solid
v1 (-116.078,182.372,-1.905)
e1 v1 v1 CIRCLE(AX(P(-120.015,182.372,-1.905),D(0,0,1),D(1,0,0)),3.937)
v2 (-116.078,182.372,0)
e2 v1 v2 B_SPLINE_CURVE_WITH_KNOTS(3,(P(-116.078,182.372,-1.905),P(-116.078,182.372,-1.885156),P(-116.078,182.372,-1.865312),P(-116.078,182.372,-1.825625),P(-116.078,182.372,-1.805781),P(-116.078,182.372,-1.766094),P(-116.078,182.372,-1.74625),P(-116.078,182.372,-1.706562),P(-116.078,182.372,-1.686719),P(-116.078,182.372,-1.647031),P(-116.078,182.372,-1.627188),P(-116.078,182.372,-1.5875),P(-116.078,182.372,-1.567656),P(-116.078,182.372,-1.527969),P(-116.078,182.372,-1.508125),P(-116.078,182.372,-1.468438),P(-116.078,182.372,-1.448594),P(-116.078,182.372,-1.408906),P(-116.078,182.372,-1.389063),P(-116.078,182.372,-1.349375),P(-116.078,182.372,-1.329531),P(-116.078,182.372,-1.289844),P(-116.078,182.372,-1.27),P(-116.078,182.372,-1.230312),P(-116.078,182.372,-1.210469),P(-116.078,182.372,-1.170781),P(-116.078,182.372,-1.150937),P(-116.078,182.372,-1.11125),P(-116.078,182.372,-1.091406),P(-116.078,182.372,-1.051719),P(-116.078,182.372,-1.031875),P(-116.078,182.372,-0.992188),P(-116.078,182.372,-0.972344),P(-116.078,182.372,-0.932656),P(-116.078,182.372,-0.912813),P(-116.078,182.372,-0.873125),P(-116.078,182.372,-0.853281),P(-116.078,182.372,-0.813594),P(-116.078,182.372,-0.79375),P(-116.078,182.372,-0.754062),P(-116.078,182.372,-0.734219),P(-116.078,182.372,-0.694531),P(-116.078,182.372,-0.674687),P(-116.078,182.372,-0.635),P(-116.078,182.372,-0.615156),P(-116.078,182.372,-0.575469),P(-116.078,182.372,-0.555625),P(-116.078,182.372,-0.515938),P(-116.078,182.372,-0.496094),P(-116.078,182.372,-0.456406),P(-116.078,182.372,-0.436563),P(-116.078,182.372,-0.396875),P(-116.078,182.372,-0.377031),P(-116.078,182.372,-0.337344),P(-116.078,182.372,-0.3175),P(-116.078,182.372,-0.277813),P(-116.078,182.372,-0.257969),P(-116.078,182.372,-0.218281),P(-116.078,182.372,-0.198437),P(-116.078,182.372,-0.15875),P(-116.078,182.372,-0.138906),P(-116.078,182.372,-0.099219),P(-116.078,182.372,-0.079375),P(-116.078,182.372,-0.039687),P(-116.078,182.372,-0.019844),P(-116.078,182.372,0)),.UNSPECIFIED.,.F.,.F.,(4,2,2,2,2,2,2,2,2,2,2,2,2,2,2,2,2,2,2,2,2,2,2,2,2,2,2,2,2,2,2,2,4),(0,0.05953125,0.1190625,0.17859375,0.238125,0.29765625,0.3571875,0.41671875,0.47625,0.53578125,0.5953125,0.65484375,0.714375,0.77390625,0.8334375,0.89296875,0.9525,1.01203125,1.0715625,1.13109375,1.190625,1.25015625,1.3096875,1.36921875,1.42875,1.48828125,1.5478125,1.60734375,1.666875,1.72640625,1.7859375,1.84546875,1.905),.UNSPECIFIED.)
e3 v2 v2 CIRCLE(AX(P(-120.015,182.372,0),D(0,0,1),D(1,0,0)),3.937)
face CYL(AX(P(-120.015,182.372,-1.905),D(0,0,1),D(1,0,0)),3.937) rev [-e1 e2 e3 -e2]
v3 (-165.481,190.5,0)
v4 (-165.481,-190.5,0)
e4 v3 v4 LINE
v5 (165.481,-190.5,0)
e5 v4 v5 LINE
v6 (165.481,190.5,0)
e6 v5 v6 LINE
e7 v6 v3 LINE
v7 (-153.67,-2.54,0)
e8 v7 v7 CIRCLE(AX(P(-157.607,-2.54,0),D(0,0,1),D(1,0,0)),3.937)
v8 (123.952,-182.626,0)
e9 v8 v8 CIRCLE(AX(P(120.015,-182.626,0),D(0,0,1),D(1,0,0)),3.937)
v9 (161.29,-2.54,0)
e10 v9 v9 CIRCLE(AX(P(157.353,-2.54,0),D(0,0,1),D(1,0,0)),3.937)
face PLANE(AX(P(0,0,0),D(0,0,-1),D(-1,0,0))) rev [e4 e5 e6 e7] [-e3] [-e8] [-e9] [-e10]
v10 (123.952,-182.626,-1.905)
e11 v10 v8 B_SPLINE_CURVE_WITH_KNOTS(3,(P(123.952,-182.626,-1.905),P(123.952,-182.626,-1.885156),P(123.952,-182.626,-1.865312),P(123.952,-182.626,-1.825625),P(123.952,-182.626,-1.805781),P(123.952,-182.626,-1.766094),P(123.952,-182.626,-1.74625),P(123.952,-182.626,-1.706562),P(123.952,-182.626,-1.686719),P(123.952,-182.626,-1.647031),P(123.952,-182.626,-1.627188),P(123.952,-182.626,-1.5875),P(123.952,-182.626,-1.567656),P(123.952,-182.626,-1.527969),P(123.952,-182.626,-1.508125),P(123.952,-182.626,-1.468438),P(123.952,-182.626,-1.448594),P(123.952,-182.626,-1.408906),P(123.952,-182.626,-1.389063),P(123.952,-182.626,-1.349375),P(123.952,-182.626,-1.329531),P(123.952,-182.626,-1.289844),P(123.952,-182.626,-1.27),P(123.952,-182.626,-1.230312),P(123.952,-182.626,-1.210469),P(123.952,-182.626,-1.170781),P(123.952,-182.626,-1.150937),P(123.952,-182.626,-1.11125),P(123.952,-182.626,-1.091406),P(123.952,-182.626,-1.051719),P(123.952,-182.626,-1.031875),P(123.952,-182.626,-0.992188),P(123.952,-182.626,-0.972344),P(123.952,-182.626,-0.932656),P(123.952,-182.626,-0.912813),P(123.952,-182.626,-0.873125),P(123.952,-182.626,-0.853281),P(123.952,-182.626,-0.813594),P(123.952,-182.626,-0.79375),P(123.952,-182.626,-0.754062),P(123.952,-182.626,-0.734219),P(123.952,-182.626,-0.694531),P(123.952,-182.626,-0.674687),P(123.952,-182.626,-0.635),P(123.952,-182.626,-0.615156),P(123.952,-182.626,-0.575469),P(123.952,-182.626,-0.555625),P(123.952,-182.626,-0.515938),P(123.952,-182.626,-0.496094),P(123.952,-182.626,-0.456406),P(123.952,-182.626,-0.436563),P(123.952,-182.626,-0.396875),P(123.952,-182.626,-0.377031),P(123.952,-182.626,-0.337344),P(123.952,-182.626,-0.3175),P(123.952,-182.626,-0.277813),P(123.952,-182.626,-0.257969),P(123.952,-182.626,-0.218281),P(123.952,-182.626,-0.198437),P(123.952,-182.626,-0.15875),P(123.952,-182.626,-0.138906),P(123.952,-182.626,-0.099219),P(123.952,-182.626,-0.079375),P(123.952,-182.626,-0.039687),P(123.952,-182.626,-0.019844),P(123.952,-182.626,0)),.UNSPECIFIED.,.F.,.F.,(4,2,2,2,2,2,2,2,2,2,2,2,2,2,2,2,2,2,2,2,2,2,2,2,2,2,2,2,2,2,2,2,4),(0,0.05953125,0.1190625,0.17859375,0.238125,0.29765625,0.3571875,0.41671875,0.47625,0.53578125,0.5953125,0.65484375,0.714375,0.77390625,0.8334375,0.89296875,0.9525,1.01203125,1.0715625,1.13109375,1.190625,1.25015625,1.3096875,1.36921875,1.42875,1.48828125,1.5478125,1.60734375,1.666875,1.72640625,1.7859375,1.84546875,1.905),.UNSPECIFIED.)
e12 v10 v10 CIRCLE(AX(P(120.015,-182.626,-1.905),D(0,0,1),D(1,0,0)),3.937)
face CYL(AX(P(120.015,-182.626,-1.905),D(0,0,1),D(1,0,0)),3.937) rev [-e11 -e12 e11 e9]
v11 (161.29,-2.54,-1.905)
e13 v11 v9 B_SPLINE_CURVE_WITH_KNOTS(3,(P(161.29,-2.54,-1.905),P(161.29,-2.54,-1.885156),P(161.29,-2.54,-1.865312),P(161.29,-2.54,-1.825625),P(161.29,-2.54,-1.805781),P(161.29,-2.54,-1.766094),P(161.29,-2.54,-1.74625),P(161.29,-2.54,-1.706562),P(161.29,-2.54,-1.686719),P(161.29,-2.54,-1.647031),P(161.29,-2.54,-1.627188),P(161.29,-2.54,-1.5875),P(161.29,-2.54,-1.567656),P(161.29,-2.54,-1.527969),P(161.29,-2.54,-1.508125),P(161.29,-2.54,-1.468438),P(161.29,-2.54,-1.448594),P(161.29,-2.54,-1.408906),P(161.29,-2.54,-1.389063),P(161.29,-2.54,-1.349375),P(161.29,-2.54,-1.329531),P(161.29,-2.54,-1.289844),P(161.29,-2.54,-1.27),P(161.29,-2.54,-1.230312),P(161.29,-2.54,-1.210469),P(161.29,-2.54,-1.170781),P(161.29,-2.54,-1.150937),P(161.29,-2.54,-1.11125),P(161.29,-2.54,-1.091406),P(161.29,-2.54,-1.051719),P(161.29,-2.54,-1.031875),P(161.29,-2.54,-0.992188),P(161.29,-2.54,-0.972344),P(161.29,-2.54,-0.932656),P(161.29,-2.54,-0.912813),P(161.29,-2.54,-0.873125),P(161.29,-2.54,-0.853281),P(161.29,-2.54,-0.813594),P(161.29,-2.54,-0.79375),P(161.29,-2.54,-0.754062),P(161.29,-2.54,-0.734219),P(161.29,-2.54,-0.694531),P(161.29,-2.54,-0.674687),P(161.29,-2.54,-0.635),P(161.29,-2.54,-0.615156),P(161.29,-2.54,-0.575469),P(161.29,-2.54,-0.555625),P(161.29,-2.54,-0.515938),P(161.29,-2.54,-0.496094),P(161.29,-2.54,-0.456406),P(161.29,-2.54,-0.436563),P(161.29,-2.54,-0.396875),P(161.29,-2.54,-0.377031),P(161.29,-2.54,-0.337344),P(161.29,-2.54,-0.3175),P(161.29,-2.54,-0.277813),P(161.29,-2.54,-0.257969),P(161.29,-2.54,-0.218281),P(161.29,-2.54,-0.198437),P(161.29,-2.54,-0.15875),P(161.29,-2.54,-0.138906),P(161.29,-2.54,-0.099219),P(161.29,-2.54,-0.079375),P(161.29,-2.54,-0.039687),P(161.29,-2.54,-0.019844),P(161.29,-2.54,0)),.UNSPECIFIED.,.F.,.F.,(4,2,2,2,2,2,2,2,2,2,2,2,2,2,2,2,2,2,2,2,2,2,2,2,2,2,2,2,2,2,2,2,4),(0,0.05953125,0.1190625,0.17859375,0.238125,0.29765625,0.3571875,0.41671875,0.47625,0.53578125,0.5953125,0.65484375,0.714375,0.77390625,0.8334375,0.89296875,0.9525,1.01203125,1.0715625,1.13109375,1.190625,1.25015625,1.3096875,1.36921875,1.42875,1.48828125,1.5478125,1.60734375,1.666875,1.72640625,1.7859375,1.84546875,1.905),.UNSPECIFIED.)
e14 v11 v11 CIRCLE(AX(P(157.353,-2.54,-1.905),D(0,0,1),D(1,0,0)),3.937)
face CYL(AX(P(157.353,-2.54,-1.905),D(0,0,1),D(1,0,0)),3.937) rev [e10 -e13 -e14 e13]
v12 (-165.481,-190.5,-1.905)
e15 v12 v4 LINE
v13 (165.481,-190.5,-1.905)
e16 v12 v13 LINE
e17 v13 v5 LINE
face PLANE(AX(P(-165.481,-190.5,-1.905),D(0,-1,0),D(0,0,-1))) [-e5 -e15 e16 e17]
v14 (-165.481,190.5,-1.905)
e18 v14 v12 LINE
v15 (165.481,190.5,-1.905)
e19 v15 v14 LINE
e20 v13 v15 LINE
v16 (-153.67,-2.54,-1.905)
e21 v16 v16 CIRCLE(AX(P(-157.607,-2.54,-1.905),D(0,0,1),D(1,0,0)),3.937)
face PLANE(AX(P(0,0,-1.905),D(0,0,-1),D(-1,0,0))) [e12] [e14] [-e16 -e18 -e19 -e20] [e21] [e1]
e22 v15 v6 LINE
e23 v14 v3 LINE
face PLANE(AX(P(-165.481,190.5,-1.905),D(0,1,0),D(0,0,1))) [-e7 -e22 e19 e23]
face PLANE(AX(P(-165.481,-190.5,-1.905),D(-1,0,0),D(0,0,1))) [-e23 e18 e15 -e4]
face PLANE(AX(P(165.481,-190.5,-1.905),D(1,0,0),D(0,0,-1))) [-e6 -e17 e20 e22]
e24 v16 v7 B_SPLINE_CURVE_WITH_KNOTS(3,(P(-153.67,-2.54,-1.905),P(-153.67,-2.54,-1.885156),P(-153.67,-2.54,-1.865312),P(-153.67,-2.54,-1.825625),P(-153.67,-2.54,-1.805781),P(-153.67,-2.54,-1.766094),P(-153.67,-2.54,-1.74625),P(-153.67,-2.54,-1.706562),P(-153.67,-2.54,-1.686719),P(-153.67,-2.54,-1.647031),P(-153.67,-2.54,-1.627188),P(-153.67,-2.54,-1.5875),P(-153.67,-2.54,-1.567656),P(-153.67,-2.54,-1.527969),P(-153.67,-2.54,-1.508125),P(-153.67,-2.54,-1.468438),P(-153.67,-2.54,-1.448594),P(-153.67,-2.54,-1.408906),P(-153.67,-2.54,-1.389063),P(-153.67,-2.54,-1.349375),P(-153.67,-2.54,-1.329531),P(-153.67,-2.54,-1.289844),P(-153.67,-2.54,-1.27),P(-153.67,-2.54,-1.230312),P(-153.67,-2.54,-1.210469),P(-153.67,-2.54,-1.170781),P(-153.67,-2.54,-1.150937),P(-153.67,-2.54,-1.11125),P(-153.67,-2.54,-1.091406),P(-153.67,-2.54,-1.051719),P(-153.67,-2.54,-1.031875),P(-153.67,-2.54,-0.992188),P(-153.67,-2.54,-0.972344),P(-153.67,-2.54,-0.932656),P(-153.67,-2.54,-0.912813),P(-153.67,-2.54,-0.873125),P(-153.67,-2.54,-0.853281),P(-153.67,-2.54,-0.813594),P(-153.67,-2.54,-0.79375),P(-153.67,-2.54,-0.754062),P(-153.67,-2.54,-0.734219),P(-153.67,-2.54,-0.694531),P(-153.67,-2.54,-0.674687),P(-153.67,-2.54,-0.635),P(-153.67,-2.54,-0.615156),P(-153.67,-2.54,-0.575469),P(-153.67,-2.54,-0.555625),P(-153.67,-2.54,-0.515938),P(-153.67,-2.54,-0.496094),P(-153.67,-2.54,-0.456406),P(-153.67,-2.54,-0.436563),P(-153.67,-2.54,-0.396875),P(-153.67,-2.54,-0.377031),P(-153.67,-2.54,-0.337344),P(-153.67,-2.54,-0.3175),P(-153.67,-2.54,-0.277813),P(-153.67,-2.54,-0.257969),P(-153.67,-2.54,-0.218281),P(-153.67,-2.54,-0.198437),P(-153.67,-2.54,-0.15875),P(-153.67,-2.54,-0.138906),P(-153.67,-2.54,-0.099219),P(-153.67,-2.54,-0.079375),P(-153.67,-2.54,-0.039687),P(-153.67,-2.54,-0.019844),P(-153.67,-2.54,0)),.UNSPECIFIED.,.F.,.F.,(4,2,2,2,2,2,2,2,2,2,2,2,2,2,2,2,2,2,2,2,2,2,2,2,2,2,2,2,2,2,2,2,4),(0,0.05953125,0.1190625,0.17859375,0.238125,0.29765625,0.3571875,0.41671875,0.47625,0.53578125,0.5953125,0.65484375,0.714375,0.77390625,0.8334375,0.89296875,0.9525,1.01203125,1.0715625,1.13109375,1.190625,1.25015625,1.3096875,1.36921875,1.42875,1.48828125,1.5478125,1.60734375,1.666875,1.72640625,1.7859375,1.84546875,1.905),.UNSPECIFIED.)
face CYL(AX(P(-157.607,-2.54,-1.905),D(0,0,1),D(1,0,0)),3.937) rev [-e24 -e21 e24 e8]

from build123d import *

# Parameters (mm, degrees)
CROQUIS1_W            = 330.962
CROQUIS1_H            = 381
BRIDA_BASE1_DEPTH     = 1.905
CROQUIS6_R            = 3.937
CORTAR_EXTRUIR1_DEPTH = 253.34468567


# Sheet-metal steps are written as plain solids
with BuildPart() as part:
    # Croquis1 → Brida base1 (new body)
    with BuildSketch(Plane.XY):
        Rectangle(CROQUIS1_W, CROQUIS1_H)
    extrude(amount=-BRIDA_BASE1_DEPTH)

    # Croquis6 → Cortar-Extruir1 (cut, through all)
    with BuildSketch(Plane.XY):
        with Locations((-120.015, 182.372)):
            Circle(CROQUIS6_R)
        with Locations((-157.607, -2.54)):
            Circle(CROQUIS6_R)
        with Locations((157.353, -2.54)):
            Circle(CROQUIS6_R)
        with Locations((120.015, -182.626)):
            Circle(CROQUIS6_R)
    extrude(amount=-CORTAR_EXTRUIR1_DEPTH, mode=Mode.SUBTRACT)


solid = part.part
